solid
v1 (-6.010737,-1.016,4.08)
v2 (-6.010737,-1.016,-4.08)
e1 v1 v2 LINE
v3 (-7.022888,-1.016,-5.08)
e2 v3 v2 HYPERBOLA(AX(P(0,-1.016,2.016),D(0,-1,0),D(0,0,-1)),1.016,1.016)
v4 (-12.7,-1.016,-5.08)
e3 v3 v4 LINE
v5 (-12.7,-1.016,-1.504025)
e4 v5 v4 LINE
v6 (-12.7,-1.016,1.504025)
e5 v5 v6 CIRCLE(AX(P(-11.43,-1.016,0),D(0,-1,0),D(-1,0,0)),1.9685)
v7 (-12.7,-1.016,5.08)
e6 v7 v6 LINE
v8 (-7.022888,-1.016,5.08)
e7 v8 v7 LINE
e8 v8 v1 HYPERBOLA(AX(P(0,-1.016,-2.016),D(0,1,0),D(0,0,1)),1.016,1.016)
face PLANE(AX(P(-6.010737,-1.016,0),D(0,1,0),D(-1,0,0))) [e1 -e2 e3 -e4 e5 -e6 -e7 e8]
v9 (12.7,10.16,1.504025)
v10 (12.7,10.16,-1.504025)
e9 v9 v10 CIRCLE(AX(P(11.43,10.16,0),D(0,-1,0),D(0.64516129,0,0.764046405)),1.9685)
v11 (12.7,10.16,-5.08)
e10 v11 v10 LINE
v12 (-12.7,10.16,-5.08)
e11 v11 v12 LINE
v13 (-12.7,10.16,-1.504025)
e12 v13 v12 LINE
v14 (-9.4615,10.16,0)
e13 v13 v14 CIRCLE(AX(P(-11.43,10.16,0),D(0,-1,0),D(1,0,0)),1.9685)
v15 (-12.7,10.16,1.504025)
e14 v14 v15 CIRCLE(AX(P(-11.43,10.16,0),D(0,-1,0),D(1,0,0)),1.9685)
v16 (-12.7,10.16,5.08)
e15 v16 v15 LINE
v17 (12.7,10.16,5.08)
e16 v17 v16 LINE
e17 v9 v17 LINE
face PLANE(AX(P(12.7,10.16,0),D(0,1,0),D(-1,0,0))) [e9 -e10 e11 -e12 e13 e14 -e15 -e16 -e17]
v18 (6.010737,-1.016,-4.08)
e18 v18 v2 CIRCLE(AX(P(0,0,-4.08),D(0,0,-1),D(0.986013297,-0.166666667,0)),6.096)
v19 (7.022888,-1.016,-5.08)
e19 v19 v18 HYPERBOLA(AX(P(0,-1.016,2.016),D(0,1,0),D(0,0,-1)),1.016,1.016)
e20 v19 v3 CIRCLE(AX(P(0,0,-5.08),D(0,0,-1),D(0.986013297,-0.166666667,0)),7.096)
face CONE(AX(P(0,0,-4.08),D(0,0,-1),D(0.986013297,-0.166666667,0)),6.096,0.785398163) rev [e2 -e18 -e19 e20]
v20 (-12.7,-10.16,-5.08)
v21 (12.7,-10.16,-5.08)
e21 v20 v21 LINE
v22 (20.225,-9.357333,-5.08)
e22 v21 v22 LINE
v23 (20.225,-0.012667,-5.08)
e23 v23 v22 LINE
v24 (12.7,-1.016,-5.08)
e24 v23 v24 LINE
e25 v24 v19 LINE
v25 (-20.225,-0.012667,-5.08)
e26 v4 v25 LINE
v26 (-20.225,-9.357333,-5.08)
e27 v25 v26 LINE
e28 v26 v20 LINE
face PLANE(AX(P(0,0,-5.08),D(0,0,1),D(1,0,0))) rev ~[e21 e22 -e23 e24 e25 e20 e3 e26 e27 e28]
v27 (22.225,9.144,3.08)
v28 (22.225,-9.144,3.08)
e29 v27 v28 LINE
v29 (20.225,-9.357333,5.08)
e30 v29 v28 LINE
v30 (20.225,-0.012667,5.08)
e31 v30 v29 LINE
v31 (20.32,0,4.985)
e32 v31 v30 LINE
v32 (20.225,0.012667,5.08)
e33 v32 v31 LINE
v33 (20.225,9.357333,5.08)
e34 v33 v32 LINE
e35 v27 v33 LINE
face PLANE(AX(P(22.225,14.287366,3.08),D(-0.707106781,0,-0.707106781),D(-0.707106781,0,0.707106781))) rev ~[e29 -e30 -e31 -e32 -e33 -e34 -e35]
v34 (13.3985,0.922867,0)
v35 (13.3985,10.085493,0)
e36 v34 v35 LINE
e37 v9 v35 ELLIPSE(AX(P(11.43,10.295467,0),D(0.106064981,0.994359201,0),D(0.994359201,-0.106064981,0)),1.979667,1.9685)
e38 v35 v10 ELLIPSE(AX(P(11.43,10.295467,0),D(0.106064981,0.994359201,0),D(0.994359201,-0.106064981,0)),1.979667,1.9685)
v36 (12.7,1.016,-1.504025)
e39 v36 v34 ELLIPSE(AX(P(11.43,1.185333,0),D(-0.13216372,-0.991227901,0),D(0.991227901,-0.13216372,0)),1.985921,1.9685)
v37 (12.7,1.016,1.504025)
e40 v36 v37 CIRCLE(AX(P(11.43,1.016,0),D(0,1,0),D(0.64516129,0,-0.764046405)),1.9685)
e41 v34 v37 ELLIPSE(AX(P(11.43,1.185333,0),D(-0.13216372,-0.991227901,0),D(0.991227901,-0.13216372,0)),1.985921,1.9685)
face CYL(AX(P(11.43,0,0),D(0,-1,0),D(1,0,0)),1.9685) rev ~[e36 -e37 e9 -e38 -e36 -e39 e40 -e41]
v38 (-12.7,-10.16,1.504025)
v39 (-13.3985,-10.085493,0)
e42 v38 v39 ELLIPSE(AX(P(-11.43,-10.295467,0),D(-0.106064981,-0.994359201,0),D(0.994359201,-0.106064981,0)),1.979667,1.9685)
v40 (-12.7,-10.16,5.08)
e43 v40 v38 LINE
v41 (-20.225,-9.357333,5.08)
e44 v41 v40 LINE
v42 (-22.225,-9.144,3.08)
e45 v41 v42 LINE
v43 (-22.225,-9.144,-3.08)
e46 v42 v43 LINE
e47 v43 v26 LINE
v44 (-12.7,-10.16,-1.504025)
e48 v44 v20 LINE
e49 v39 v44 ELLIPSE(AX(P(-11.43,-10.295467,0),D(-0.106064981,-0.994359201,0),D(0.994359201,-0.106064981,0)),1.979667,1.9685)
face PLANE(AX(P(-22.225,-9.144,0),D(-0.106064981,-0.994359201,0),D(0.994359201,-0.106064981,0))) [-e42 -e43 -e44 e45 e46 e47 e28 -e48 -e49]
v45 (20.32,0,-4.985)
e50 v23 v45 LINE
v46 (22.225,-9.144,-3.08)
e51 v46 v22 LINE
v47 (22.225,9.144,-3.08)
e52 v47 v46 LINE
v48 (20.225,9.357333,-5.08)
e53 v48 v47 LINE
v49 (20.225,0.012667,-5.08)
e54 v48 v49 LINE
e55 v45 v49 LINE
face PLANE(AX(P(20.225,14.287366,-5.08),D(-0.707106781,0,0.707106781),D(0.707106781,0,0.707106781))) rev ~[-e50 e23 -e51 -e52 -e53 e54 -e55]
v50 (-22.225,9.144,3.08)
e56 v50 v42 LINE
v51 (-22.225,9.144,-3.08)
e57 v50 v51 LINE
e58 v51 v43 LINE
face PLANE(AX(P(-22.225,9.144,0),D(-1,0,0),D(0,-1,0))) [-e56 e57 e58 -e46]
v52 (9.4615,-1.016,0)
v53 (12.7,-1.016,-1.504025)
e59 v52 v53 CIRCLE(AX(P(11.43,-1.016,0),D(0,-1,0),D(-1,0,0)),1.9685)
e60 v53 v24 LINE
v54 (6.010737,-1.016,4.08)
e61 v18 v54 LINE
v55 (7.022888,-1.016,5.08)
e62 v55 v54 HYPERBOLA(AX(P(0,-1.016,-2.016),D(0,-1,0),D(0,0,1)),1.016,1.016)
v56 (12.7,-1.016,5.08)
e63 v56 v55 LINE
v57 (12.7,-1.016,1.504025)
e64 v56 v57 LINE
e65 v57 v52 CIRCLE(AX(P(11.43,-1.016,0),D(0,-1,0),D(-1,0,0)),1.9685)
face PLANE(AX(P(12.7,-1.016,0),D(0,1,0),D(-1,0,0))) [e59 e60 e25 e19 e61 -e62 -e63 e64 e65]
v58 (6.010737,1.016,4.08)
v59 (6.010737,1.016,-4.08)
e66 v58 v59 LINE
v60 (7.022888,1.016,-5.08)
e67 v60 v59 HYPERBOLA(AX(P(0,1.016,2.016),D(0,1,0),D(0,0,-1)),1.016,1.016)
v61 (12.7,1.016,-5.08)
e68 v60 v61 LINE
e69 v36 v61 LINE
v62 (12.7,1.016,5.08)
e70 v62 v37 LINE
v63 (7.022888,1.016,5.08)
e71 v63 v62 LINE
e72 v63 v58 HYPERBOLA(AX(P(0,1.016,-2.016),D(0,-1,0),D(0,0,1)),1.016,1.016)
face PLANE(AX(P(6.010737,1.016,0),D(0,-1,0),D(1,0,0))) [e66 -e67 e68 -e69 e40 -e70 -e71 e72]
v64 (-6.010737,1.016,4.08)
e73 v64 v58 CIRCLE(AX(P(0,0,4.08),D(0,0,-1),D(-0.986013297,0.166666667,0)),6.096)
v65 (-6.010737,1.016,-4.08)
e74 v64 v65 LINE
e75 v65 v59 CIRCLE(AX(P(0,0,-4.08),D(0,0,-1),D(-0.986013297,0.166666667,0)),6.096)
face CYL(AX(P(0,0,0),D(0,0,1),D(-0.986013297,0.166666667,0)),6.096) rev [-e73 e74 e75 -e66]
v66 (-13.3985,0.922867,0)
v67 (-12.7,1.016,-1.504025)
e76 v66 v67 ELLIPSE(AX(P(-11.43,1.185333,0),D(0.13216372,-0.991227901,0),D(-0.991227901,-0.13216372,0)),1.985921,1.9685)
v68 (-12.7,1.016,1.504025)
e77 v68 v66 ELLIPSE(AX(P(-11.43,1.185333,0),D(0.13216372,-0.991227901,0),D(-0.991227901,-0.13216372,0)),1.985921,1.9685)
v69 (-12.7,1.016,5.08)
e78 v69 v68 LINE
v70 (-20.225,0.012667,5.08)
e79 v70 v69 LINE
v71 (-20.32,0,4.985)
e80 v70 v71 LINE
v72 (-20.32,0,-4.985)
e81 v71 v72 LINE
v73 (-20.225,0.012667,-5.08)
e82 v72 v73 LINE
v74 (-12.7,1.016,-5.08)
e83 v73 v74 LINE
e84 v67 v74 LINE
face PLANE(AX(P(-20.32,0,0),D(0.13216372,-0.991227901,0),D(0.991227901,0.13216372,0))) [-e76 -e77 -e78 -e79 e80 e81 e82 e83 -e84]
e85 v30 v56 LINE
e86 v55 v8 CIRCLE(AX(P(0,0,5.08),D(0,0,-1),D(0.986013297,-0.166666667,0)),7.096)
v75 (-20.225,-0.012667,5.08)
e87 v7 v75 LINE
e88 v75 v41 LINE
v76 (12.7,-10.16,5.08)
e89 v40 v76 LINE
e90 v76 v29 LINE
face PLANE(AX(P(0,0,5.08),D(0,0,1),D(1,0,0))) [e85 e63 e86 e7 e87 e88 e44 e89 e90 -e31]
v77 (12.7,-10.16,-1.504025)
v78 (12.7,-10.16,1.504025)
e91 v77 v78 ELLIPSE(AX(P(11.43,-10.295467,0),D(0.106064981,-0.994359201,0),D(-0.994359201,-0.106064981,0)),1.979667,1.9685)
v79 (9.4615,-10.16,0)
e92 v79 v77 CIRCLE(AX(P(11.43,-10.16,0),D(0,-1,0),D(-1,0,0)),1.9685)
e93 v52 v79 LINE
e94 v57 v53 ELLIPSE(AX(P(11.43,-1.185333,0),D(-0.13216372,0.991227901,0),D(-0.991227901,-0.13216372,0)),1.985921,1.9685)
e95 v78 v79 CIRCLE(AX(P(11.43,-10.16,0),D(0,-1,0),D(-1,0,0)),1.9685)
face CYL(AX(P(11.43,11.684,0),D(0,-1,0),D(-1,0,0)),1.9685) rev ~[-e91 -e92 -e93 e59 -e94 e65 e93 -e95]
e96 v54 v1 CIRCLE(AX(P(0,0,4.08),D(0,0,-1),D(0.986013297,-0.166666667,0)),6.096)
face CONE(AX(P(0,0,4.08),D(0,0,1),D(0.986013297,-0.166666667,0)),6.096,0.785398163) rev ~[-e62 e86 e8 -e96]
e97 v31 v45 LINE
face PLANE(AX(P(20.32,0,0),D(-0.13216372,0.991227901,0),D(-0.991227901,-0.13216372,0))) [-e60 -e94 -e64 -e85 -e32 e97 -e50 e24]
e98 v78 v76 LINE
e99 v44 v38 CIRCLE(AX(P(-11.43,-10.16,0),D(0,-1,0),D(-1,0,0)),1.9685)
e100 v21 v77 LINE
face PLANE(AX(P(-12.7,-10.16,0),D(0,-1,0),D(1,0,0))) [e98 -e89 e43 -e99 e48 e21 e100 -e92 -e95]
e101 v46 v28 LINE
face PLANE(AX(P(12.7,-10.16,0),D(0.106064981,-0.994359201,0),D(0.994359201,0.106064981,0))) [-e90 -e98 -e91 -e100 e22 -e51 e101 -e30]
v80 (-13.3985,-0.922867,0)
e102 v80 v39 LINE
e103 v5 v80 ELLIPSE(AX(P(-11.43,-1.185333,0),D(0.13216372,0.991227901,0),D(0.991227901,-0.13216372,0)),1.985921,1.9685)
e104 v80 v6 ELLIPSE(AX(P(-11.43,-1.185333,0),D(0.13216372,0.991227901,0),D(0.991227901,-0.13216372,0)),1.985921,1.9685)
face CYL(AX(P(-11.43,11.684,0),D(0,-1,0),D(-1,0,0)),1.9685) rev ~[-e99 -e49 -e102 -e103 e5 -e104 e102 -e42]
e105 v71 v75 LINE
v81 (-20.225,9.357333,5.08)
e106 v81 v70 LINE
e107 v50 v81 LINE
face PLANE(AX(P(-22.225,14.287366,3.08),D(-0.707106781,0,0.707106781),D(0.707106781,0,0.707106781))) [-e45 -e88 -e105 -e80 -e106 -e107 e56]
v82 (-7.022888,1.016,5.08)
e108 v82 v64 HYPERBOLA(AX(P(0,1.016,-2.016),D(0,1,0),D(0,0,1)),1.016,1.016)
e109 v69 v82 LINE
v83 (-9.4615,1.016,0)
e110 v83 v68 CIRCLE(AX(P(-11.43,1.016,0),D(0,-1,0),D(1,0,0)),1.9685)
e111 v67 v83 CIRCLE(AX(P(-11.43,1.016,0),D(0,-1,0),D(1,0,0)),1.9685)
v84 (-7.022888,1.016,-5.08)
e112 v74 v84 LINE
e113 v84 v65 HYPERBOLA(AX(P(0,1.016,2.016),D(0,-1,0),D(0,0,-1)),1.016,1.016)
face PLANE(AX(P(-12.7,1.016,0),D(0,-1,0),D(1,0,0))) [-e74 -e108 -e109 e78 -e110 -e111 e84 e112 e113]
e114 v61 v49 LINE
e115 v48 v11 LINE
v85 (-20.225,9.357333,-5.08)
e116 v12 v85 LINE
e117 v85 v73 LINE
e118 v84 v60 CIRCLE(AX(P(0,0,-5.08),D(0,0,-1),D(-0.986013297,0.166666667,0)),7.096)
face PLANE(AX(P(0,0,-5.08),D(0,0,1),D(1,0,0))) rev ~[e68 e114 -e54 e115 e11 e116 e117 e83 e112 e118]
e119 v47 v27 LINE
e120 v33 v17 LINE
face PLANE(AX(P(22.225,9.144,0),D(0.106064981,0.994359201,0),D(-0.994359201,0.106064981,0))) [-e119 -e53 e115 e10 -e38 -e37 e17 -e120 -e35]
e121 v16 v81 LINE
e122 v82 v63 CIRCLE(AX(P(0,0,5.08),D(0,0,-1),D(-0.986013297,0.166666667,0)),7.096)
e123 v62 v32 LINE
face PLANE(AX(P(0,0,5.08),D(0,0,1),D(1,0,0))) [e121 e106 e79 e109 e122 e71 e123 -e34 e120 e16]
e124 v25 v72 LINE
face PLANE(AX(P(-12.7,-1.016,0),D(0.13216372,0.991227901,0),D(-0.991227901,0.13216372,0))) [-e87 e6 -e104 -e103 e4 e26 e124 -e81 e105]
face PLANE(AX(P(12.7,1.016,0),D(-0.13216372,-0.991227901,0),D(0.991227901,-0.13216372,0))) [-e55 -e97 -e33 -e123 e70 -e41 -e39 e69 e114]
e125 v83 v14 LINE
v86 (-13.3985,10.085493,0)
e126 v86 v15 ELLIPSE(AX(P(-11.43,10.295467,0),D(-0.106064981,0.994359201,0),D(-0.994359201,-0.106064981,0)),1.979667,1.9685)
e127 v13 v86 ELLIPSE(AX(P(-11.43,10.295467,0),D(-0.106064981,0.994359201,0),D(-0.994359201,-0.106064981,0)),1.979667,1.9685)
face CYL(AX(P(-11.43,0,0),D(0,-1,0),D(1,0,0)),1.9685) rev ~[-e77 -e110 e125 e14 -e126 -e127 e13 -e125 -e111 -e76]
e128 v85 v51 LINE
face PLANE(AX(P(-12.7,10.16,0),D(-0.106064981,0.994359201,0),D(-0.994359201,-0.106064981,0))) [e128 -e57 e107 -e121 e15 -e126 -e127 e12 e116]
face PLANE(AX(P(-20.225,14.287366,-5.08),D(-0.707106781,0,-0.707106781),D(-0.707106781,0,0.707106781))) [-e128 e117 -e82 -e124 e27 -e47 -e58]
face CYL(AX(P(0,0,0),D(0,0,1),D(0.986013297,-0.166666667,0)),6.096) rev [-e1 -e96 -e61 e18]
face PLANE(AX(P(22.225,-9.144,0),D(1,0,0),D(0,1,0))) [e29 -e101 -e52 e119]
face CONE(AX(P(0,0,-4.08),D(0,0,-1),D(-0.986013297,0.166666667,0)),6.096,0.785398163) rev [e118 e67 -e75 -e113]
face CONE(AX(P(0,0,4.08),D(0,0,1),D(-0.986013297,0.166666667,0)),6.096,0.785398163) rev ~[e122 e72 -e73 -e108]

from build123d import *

# Parameters (mm, degrees)
F1_DEPTH    = 5.08
F3_D        = 3.937
F3_DEPTH    = 12.7
F3_TIP      = 1.1827941286
F4_D        = 3.937
F4_DEPTH    = 12.7
F4_START    = 1.016
F4_TIP      = 1.1827941286
F5_T1_DEPTH = 28.5747319519
F6_SIZE     = 1


# Not quite as in the source:
# - a fillet or chamfer that OpenCascade refuses, or shapes differently, is made with other operations: its cross-section is extruded or revolved along the edge and cut away or added


with BuildPart() as f1:
    # F0 (on Top) → F1 (new body, symmetric)
    with BuildSketch(Plane.XY):
        Polygon((-12.7, -10.16), (12.7, -10.16), (22.225, -9.144), (22.225, 9.144), (12.7, 10.16), (-12.7, 10.16), (-22.225, 9.144), (-22.225, -9.144), align=None)
        with BuildLine():
            ThreePointArc((6.0107370596, -1.016), (0, -6.096), (-6.0107370596, -1.016))
            Line((-6.0107370596, -1.016), (-12.7, -1.016))
            Line((-12.7, -1.016), (-20.32, 0))
            Line((-20.32, 0), (-12.7, 1.016))
            Line((-12.7, 1.016), (-6.0107370596, 1.016))
            ThreePointArc((-6.0107370596, 1.016), (0, 6.096), (6.0107370596, 1.016))
            Line((6.0107370596, 1.016), (12.7, 1.016))
            Line((12.7, 1.016), (20.32, 0))
            Line((20.32, 0), (12.7, -1.016))
            Line((12.7, -1.016), (6.0107370596, -1.016))
        make_face(mode=Mode.SUBTRACT)
    extrude(amount=F1_DEPTH, both=True)

    # F3 (one way)
    with BuildSketch(Plane.XZ):
        with Locations((-11.43, 0), (11.43, 0)):
            Circle(F3_D / 2)
    extrude(amount=-F3_DEPTH, mode=Mode.SUBTRACT)
    with Locations(Plane.XZ):
        with Locations((-11.43, 0), (11.43, 0)):
            with Locations((0, 0, -(F3_DEPTH + F3_TIP / 2))):  # 118° drill point
                Cone(0, F3_D / 2, F3_TIP, mode=Mode.SUBTRACT)

    # F4
    # its depths count from where the whole tool has entered the part; down to there all is cleared
    with Locations(Plane(origin=(0, 0, 0), x_dir=(1, 0, 0), z_dir=(0, 1, 0)).offset(-F4_START)):
        with Locations((-11.43, 0), (11.43, 0)):
            Hole(F4_D / 2, depth=F4_DEPTH)
            with Locations((0, 0, -(F4_DEPTH + F4_TIP / 2))):  # 118° drill point
                Cone(0, F4_D / 2, F4_TIP, mode=Mode.SUBTRACT)

    # F5: chamfer of 2 on 4 edges, made by hand

    # F5_s2 → F5_t1 (cut)
    with BuildSketch(Plane.XZ.offset(-14.2873659759)):
        Polygon((20.225, -5.08), (22.225, -3.08), (22.225, -5.08), align=None)
        Polygon((22.225, 3.08), (20.225, 5.08), (22.225, 5.08), align=None)
        Polygon((-22.225, 3.08), (-20.225, 5.08), (-22.225, 5.08), align=None)
        Polygon((-20.225, -5.08), (-22.225, -3.08), (-22.225, -5.08), align=None)
    extrude(amount=F5_T1_DEPTH, mode=Mode.SUBTRACT)

    # F6
    f6_edges = [f1.edges().sort_by_distance(p)[0] for p in [
        (0, -6.096, -5.08),
        (0, -6.096, 5.08),
        (0, 6.096, 5.08),
        (0, 6.096, -5.08),
    ]]
    chamfer(f6_edges, length=F6_SIZE)


solid = f1.part
